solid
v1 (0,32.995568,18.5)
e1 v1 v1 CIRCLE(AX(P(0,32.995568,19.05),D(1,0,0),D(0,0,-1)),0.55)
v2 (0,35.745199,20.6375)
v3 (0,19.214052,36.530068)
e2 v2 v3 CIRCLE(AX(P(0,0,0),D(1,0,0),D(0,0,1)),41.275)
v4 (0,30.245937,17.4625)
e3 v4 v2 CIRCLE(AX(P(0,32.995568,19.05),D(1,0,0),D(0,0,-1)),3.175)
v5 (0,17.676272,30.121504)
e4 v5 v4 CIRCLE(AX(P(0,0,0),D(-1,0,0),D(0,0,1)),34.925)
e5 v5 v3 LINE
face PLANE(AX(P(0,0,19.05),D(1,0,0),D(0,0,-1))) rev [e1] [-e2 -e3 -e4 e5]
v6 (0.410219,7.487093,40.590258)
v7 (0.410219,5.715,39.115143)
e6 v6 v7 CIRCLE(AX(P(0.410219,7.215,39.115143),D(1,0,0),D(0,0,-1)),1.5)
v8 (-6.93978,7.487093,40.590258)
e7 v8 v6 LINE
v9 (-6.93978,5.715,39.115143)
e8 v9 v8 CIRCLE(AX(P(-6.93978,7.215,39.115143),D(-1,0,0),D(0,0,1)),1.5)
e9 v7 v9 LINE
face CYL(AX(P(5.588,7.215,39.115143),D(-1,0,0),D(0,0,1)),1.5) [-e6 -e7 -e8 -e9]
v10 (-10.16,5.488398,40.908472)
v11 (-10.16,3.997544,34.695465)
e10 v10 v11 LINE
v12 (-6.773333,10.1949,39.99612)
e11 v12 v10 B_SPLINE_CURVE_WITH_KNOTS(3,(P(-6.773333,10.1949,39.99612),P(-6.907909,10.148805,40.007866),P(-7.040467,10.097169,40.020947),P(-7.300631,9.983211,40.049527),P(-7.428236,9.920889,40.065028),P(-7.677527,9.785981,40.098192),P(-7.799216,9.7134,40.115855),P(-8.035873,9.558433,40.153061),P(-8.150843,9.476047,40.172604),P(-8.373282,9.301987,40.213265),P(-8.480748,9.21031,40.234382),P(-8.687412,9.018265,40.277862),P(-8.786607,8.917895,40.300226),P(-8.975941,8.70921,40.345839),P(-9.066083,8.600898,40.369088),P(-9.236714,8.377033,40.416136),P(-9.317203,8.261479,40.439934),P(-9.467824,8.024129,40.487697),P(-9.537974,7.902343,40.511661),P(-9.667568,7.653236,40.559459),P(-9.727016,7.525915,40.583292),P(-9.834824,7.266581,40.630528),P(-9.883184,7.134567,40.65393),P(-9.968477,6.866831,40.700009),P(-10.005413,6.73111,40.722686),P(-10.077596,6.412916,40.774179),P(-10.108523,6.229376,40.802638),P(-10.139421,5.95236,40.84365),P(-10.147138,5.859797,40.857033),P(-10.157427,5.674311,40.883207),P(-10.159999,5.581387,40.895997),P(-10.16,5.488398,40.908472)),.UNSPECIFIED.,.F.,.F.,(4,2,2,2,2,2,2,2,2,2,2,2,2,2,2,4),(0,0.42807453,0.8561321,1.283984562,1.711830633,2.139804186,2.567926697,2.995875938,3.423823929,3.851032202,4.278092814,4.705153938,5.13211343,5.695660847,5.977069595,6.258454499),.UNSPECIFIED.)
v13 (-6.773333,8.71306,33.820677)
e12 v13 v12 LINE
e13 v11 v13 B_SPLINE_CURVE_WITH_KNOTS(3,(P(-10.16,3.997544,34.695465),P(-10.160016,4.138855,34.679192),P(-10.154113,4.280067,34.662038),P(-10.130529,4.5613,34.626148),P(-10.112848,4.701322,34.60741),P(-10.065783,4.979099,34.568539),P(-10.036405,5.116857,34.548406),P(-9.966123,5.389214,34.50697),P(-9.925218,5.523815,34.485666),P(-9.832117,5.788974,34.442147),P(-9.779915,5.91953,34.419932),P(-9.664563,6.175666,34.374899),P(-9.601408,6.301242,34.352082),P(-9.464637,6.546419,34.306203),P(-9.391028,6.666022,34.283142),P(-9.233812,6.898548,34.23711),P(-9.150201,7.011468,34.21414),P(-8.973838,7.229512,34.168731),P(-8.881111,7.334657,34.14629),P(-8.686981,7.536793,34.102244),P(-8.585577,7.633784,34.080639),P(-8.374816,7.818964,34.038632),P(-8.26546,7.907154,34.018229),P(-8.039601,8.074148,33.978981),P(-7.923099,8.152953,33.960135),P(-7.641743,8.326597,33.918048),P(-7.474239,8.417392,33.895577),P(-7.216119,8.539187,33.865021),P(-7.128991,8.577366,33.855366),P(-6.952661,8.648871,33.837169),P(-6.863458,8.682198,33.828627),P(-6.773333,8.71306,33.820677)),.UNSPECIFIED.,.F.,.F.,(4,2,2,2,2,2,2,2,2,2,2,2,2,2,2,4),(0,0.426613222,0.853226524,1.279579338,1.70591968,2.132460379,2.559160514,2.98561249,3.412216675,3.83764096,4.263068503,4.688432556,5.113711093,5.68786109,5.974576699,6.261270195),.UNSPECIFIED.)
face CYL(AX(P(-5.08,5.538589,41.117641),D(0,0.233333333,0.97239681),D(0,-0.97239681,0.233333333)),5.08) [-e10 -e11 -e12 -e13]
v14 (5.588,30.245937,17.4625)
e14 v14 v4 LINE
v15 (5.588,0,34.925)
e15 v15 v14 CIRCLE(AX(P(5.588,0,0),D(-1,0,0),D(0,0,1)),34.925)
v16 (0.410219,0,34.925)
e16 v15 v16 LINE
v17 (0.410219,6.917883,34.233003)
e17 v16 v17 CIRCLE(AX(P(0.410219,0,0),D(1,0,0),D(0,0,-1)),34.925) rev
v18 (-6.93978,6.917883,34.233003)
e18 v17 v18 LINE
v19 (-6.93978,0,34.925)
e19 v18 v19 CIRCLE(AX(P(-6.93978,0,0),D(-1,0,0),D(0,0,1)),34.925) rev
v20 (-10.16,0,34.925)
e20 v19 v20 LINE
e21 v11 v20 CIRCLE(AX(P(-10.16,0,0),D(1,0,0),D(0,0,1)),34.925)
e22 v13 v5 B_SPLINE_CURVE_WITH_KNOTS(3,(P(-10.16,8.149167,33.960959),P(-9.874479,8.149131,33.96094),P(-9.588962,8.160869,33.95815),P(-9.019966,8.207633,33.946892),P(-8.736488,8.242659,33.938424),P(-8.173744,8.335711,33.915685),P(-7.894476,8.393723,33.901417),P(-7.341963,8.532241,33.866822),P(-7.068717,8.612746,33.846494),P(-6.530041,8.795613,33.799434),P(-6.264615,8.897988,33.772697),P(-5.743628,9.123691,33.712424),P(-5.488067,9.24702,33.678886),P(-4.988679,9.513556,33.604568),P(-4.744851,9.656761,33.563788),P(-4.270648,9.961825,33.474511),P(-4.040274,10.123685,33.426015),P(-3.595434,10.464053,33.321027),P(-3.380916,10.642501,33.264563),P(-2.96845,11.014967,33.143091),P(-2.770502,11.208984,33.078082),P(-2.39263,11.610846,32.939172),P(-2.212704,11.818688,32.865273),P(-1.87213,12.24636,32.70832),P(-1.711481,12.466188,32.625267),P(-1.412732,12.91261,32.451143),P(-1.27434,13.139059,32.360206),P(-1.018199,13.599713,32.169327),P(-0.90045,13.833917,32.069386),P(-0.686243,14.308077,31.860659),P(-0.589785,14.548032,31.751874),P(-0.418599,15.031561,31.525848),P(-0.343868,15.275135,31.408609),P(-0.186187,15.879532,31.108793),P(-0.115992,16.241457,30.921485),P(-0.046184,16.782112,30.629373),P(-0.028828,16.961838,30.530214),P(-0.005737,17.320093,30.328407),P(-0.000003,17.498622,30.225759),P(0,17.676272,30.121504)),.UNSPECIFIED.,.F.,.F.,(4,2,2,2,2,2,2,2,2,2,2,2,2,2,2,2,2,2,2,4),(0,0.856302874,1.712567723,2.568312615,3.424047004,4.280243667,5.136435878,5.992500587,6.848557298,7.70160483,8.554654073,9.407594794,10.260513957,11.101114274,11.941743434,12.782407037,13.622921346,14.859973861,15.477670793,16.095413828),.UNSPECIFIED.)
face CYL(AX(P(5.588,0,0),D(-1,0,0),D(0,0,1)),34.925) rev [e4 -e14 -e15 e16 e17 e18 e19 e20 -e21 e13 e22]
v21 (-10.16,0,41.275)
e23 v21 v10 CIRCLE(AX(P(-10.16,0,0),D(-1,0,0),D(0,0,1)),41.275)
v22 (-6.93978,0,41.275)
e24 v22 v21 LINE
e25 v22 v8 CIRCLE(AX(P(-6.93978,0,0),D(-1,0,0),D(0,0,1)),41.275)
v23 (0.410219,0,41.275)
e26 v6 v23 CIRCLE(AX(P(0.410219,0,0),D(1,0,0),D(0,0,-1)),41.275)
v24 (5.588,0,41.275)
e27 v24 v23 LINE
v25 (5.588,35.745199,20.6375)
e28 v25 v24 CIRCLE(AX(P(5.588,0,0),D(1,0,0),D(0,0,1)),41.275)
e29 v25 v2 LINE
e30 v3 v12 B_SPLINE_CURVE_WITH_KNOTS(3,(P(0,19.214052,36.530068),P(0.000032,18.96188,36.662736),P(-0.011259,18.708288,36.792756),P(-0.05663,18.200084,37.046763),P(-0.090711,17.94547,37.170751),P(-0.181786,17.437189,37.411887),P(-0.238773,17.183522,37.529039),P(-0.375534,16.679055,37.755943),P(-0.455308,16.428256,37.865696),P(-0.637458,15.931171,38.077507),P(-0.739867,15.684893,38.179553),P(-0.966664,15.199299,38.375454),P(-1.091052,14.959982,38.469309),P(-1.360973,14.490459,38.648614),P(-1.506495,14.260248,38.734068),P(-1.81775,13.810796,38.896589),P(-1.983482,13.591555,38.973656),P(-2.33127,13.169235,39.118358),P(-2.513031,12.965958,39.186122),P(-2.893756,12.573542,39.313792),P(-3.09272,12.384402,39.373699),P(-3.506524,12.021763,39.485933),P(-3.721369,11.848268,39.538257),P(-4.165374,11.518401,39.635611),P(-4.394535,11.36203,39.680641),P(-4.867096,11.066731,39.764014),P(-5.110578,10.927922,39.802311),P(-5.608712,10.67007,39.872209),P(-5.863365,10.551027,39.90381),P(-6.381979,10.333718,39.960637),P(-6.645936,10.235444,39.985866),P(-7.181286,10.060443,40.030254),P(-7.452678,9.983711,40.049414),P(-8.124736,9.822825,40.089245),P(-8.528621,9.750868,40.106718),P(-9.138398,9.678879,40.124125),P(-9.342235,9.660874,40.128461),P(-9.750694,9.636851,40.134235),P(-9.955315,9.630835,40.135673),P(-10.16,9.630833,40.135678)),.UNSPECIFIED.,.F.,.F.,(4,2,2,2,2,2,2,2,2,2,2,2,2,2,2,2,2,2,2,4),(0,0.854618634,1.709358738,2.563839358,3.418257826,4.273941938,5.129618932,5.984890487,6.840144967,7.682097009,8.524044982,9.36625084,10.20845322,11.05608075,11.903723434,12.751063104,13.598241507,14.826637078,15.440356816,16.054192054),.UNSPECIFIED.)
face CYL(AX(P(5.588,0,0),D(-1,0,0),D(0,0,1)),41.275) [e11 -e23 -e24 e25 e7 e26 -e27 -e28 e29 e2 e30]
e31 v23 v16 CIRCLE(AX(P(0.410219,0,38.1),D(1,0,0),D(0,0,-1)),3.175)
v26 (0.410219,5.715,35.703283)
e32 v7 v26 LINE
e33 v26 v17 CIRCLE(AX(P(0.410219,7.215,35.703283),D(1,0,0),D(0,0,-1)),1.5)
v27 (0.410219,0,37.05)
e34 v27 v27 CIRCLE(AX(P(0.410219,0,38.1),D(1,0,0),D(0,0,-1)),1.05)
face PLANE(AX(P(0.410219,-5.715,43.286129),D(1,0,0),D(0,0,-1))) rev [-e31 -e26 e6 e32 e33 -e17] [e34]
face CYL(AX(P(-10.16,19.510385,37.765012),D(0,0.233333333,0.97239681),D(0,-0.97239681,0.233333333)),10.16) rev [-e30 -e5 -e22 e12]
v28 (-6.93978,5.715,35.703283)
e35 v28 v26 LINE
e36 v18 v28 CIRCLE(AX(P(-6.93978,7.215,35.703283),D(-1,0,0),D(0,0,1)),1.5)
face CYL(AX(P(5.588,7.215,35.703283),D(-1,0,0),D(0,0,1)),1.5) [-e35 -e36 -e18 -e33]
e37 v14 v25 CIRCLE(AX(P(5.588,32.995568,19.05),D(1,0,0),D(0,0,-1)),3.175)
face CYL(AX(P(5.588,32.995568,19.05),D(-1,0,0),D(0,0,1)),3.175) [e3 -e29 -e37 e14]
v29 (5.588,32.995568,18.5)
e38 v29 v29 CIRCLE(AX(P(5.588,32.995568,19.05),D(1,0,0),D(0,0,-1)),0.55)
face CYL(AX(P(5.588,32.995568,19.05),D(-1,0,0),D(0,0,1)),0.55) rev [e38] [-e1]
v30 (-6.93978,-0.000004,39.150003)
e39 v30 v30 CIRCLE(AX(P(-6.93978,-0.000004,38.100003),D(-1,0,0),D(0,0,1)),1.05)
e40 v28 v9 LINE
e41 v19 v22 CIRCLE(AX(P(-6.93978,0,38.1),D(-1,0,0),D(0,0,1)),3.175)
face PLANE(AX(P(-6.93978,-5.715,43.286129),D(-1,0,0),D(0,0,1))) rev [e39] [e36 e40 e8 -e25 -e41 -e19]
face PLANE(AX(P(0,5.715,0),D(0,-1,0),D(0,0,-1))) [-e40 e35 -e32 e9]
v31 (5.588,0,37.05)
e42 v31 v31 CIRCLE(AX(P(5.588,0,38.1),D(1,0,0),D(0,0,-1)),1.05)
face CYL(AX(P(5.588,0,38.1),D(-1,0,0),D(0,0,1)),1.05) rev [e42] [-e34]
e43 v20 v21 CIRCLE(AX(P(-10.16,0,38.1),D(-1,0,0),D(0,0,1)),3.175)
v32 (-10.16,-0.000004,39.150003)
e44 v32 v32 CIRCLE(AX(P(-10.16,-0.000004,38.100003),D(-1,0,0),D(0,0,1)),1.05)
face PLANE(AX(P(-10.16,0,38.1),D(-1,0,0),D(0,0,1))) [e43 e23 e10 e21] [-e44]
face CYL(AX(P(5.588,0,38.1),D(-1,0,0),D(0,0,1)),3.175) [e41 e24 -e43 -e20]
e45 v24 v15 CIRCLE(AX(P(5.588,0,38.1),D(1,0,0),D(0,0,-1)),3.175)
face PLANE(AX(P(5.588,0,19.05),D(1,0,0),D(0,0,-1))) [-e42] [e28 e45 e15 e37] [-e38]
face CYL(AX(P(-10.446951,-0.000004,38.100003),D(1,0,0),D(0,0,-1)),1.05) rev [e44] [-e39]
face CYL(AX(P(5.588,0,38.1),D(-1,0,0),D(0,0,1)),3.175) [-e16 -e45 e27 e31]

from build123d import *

# Parameters (mm, degrees)
ESQUISSE1_R                  = 1.050000000000002
ESQUISSE1_R_2                = 0.5500000000000002
BOSS_EXTRU_1_DEPTH           = 5.588
BOSS_EXTRU_2_START           = 10.16
BOSS_EXTRU_2_DEPTH           = 10.16
ESQUISSE3_W                  = 7.349999
ESQUISSE3_H                  = 12.302264747859223
ENL_V_MAT_EXTRU_1_DEPTH      = 5.715
CONG_1_R                     = 10.16
CONG_2_R                     = 5.08
ENL_V_MAT_EXTRU_2_DEPTH      = 58.09584154270072
ENL_V_MAT_EXTRU_2_DEPTH_BACK = 58.09584154270072
ESQUISSE4_R                  = 1.050000000000002
CONG_3_R                     = 1.5


with BuildPart() as part:
    # Esquisse1 → Boss.-Extru.1 (new body)
    with BuildSketch(Plane(origin=(0, 0, 0), x_dir=(0, 0, -1), z_dir=(1, 0, 0))):
        with BuildLine():
            ThreePointArc((-34.925000000000004, 0), (-30.245937227171517, 17.462500000000013), (-17.4625, 30.245937227171524))
            ThreePointArc((-17.4625, 30.245937227171524), (-16.300369342984403, 34.583067884187116), (-20.637499999999996, 35.745198541202704))
            ThreePointArc((-20.637499999999996, 35.745198541202704), (-35.7451985412027, 20.637500000000014), (-41.275, 0))
            ThreePointArc((-41.275, 0), (-38.1, -3.174999999999997), (-34.925000000000004, 0))
        make_face()
        with Locations((-38.1, 0)):
            Circle(ESQUISSE1_R, mode=Mode.SUBTRACT)
        with Locations((-19.049999999999997, 32.99556788418712)):
            Circle(ESQUISSE1_R_2, mode=Mode.SUBTRACT)
    extrude(amount=BOSS_EXTRU_1_DEPTH)

    # Esquisse2 → Boss.-Extru.2 (add)
    with BuildSketch(Plane.ZY.offset(BOSS_EXTRU_2_START)):
        with BuildLine():
            Line((40.13567832123378, 9.630833333333326), (33.96095857950552, 8.14916666666666))
            ThreePointArc((33.96095857950552, 8.14916666666666), (34.68315227447781, 4.10299565017866), (34.925000000000004, 0))
            ThreePointArc((34.925000000000004, 0), (38.1, -3.174999999999997), (41.275, 0))
            ThreePointArc((41.275, 0), (40.9891799607465, 4.848994859302054), (40.13567832123378, 9.630833333333326))
        make_face()
    extrude(amount=-BOSS_EXTRU_2_DEPTH)

    # Esquisse3 → Enlèv. mat.-Extru.1 (cut, symmetric)
    with BuildSketch(Plane(origin=(0, 0, 0), x_dir=(1, 0, 0), z_dir=(0, 1, 0))):
        with Locations((-3.2647804999577055, -37.13499681447274)):
            Rectangle(ESQUISSE3_W, ESQUISSE3_H)
    extrude(amount=ENL_V_MAT_EXTRU_1_DEPTH, both=True, mode=Mode.SUBTRACT)

    # Congé1
    cong_1_edges = [part.edges().sort_by_distance(p)[0] for p in [
        (0, 8.889999999999993, 37.04831845036965),
    ]]
    fillet(cong_1_edges, radius=CONG_1_R - 0.0001)  # a hair under: the kernel refuses the full size

    # Congé2
    cong_2_edges = [part.edges().sort_by_distance(p)[0] for p in [
        (-10.16, 8.889999999999993, 37.04831845036965),
    ]]
    fillet(cong_2_edges, radius=CONG_2_R)

    # Esquisse4 → Enlèv. mat.-Extru.2 (cut, two sides: drawn at the far end of the back side and taken through both)
    with BuildSketch(Plane(origin=(5.588, 0, 0), x_dir=(0, 0, -1), z_dir=(1, 0, 0)).offset(-ENL_V_MAT_EXTRU_2_DEPTH_BACK)):
        with Locations(Location((-38.10000264654745, -3.51466647443e-06, 0), (0, 0, 0.000191786))):
            Circle(ESQUISSE4_R)
    extrude(amount=ENL_V_MAT_EXTRU_2_DEPTH + ENL_V_MAT_EXTRU_2_DEPTH_BACK, mode=Mode.SUBTRACT)

    # Congé3
    cong_3_edges = [part.edges().sort_by_distance(p)[0] for p in [
        (-3.2647804999577055, 5.715, 40.87743142615494),
        (-3.2647804999577055, 5.715, 34.45423631427637),
    ]]
    fillet(cong_3_edges, radius=CONG_3_R)


solid = part.part
